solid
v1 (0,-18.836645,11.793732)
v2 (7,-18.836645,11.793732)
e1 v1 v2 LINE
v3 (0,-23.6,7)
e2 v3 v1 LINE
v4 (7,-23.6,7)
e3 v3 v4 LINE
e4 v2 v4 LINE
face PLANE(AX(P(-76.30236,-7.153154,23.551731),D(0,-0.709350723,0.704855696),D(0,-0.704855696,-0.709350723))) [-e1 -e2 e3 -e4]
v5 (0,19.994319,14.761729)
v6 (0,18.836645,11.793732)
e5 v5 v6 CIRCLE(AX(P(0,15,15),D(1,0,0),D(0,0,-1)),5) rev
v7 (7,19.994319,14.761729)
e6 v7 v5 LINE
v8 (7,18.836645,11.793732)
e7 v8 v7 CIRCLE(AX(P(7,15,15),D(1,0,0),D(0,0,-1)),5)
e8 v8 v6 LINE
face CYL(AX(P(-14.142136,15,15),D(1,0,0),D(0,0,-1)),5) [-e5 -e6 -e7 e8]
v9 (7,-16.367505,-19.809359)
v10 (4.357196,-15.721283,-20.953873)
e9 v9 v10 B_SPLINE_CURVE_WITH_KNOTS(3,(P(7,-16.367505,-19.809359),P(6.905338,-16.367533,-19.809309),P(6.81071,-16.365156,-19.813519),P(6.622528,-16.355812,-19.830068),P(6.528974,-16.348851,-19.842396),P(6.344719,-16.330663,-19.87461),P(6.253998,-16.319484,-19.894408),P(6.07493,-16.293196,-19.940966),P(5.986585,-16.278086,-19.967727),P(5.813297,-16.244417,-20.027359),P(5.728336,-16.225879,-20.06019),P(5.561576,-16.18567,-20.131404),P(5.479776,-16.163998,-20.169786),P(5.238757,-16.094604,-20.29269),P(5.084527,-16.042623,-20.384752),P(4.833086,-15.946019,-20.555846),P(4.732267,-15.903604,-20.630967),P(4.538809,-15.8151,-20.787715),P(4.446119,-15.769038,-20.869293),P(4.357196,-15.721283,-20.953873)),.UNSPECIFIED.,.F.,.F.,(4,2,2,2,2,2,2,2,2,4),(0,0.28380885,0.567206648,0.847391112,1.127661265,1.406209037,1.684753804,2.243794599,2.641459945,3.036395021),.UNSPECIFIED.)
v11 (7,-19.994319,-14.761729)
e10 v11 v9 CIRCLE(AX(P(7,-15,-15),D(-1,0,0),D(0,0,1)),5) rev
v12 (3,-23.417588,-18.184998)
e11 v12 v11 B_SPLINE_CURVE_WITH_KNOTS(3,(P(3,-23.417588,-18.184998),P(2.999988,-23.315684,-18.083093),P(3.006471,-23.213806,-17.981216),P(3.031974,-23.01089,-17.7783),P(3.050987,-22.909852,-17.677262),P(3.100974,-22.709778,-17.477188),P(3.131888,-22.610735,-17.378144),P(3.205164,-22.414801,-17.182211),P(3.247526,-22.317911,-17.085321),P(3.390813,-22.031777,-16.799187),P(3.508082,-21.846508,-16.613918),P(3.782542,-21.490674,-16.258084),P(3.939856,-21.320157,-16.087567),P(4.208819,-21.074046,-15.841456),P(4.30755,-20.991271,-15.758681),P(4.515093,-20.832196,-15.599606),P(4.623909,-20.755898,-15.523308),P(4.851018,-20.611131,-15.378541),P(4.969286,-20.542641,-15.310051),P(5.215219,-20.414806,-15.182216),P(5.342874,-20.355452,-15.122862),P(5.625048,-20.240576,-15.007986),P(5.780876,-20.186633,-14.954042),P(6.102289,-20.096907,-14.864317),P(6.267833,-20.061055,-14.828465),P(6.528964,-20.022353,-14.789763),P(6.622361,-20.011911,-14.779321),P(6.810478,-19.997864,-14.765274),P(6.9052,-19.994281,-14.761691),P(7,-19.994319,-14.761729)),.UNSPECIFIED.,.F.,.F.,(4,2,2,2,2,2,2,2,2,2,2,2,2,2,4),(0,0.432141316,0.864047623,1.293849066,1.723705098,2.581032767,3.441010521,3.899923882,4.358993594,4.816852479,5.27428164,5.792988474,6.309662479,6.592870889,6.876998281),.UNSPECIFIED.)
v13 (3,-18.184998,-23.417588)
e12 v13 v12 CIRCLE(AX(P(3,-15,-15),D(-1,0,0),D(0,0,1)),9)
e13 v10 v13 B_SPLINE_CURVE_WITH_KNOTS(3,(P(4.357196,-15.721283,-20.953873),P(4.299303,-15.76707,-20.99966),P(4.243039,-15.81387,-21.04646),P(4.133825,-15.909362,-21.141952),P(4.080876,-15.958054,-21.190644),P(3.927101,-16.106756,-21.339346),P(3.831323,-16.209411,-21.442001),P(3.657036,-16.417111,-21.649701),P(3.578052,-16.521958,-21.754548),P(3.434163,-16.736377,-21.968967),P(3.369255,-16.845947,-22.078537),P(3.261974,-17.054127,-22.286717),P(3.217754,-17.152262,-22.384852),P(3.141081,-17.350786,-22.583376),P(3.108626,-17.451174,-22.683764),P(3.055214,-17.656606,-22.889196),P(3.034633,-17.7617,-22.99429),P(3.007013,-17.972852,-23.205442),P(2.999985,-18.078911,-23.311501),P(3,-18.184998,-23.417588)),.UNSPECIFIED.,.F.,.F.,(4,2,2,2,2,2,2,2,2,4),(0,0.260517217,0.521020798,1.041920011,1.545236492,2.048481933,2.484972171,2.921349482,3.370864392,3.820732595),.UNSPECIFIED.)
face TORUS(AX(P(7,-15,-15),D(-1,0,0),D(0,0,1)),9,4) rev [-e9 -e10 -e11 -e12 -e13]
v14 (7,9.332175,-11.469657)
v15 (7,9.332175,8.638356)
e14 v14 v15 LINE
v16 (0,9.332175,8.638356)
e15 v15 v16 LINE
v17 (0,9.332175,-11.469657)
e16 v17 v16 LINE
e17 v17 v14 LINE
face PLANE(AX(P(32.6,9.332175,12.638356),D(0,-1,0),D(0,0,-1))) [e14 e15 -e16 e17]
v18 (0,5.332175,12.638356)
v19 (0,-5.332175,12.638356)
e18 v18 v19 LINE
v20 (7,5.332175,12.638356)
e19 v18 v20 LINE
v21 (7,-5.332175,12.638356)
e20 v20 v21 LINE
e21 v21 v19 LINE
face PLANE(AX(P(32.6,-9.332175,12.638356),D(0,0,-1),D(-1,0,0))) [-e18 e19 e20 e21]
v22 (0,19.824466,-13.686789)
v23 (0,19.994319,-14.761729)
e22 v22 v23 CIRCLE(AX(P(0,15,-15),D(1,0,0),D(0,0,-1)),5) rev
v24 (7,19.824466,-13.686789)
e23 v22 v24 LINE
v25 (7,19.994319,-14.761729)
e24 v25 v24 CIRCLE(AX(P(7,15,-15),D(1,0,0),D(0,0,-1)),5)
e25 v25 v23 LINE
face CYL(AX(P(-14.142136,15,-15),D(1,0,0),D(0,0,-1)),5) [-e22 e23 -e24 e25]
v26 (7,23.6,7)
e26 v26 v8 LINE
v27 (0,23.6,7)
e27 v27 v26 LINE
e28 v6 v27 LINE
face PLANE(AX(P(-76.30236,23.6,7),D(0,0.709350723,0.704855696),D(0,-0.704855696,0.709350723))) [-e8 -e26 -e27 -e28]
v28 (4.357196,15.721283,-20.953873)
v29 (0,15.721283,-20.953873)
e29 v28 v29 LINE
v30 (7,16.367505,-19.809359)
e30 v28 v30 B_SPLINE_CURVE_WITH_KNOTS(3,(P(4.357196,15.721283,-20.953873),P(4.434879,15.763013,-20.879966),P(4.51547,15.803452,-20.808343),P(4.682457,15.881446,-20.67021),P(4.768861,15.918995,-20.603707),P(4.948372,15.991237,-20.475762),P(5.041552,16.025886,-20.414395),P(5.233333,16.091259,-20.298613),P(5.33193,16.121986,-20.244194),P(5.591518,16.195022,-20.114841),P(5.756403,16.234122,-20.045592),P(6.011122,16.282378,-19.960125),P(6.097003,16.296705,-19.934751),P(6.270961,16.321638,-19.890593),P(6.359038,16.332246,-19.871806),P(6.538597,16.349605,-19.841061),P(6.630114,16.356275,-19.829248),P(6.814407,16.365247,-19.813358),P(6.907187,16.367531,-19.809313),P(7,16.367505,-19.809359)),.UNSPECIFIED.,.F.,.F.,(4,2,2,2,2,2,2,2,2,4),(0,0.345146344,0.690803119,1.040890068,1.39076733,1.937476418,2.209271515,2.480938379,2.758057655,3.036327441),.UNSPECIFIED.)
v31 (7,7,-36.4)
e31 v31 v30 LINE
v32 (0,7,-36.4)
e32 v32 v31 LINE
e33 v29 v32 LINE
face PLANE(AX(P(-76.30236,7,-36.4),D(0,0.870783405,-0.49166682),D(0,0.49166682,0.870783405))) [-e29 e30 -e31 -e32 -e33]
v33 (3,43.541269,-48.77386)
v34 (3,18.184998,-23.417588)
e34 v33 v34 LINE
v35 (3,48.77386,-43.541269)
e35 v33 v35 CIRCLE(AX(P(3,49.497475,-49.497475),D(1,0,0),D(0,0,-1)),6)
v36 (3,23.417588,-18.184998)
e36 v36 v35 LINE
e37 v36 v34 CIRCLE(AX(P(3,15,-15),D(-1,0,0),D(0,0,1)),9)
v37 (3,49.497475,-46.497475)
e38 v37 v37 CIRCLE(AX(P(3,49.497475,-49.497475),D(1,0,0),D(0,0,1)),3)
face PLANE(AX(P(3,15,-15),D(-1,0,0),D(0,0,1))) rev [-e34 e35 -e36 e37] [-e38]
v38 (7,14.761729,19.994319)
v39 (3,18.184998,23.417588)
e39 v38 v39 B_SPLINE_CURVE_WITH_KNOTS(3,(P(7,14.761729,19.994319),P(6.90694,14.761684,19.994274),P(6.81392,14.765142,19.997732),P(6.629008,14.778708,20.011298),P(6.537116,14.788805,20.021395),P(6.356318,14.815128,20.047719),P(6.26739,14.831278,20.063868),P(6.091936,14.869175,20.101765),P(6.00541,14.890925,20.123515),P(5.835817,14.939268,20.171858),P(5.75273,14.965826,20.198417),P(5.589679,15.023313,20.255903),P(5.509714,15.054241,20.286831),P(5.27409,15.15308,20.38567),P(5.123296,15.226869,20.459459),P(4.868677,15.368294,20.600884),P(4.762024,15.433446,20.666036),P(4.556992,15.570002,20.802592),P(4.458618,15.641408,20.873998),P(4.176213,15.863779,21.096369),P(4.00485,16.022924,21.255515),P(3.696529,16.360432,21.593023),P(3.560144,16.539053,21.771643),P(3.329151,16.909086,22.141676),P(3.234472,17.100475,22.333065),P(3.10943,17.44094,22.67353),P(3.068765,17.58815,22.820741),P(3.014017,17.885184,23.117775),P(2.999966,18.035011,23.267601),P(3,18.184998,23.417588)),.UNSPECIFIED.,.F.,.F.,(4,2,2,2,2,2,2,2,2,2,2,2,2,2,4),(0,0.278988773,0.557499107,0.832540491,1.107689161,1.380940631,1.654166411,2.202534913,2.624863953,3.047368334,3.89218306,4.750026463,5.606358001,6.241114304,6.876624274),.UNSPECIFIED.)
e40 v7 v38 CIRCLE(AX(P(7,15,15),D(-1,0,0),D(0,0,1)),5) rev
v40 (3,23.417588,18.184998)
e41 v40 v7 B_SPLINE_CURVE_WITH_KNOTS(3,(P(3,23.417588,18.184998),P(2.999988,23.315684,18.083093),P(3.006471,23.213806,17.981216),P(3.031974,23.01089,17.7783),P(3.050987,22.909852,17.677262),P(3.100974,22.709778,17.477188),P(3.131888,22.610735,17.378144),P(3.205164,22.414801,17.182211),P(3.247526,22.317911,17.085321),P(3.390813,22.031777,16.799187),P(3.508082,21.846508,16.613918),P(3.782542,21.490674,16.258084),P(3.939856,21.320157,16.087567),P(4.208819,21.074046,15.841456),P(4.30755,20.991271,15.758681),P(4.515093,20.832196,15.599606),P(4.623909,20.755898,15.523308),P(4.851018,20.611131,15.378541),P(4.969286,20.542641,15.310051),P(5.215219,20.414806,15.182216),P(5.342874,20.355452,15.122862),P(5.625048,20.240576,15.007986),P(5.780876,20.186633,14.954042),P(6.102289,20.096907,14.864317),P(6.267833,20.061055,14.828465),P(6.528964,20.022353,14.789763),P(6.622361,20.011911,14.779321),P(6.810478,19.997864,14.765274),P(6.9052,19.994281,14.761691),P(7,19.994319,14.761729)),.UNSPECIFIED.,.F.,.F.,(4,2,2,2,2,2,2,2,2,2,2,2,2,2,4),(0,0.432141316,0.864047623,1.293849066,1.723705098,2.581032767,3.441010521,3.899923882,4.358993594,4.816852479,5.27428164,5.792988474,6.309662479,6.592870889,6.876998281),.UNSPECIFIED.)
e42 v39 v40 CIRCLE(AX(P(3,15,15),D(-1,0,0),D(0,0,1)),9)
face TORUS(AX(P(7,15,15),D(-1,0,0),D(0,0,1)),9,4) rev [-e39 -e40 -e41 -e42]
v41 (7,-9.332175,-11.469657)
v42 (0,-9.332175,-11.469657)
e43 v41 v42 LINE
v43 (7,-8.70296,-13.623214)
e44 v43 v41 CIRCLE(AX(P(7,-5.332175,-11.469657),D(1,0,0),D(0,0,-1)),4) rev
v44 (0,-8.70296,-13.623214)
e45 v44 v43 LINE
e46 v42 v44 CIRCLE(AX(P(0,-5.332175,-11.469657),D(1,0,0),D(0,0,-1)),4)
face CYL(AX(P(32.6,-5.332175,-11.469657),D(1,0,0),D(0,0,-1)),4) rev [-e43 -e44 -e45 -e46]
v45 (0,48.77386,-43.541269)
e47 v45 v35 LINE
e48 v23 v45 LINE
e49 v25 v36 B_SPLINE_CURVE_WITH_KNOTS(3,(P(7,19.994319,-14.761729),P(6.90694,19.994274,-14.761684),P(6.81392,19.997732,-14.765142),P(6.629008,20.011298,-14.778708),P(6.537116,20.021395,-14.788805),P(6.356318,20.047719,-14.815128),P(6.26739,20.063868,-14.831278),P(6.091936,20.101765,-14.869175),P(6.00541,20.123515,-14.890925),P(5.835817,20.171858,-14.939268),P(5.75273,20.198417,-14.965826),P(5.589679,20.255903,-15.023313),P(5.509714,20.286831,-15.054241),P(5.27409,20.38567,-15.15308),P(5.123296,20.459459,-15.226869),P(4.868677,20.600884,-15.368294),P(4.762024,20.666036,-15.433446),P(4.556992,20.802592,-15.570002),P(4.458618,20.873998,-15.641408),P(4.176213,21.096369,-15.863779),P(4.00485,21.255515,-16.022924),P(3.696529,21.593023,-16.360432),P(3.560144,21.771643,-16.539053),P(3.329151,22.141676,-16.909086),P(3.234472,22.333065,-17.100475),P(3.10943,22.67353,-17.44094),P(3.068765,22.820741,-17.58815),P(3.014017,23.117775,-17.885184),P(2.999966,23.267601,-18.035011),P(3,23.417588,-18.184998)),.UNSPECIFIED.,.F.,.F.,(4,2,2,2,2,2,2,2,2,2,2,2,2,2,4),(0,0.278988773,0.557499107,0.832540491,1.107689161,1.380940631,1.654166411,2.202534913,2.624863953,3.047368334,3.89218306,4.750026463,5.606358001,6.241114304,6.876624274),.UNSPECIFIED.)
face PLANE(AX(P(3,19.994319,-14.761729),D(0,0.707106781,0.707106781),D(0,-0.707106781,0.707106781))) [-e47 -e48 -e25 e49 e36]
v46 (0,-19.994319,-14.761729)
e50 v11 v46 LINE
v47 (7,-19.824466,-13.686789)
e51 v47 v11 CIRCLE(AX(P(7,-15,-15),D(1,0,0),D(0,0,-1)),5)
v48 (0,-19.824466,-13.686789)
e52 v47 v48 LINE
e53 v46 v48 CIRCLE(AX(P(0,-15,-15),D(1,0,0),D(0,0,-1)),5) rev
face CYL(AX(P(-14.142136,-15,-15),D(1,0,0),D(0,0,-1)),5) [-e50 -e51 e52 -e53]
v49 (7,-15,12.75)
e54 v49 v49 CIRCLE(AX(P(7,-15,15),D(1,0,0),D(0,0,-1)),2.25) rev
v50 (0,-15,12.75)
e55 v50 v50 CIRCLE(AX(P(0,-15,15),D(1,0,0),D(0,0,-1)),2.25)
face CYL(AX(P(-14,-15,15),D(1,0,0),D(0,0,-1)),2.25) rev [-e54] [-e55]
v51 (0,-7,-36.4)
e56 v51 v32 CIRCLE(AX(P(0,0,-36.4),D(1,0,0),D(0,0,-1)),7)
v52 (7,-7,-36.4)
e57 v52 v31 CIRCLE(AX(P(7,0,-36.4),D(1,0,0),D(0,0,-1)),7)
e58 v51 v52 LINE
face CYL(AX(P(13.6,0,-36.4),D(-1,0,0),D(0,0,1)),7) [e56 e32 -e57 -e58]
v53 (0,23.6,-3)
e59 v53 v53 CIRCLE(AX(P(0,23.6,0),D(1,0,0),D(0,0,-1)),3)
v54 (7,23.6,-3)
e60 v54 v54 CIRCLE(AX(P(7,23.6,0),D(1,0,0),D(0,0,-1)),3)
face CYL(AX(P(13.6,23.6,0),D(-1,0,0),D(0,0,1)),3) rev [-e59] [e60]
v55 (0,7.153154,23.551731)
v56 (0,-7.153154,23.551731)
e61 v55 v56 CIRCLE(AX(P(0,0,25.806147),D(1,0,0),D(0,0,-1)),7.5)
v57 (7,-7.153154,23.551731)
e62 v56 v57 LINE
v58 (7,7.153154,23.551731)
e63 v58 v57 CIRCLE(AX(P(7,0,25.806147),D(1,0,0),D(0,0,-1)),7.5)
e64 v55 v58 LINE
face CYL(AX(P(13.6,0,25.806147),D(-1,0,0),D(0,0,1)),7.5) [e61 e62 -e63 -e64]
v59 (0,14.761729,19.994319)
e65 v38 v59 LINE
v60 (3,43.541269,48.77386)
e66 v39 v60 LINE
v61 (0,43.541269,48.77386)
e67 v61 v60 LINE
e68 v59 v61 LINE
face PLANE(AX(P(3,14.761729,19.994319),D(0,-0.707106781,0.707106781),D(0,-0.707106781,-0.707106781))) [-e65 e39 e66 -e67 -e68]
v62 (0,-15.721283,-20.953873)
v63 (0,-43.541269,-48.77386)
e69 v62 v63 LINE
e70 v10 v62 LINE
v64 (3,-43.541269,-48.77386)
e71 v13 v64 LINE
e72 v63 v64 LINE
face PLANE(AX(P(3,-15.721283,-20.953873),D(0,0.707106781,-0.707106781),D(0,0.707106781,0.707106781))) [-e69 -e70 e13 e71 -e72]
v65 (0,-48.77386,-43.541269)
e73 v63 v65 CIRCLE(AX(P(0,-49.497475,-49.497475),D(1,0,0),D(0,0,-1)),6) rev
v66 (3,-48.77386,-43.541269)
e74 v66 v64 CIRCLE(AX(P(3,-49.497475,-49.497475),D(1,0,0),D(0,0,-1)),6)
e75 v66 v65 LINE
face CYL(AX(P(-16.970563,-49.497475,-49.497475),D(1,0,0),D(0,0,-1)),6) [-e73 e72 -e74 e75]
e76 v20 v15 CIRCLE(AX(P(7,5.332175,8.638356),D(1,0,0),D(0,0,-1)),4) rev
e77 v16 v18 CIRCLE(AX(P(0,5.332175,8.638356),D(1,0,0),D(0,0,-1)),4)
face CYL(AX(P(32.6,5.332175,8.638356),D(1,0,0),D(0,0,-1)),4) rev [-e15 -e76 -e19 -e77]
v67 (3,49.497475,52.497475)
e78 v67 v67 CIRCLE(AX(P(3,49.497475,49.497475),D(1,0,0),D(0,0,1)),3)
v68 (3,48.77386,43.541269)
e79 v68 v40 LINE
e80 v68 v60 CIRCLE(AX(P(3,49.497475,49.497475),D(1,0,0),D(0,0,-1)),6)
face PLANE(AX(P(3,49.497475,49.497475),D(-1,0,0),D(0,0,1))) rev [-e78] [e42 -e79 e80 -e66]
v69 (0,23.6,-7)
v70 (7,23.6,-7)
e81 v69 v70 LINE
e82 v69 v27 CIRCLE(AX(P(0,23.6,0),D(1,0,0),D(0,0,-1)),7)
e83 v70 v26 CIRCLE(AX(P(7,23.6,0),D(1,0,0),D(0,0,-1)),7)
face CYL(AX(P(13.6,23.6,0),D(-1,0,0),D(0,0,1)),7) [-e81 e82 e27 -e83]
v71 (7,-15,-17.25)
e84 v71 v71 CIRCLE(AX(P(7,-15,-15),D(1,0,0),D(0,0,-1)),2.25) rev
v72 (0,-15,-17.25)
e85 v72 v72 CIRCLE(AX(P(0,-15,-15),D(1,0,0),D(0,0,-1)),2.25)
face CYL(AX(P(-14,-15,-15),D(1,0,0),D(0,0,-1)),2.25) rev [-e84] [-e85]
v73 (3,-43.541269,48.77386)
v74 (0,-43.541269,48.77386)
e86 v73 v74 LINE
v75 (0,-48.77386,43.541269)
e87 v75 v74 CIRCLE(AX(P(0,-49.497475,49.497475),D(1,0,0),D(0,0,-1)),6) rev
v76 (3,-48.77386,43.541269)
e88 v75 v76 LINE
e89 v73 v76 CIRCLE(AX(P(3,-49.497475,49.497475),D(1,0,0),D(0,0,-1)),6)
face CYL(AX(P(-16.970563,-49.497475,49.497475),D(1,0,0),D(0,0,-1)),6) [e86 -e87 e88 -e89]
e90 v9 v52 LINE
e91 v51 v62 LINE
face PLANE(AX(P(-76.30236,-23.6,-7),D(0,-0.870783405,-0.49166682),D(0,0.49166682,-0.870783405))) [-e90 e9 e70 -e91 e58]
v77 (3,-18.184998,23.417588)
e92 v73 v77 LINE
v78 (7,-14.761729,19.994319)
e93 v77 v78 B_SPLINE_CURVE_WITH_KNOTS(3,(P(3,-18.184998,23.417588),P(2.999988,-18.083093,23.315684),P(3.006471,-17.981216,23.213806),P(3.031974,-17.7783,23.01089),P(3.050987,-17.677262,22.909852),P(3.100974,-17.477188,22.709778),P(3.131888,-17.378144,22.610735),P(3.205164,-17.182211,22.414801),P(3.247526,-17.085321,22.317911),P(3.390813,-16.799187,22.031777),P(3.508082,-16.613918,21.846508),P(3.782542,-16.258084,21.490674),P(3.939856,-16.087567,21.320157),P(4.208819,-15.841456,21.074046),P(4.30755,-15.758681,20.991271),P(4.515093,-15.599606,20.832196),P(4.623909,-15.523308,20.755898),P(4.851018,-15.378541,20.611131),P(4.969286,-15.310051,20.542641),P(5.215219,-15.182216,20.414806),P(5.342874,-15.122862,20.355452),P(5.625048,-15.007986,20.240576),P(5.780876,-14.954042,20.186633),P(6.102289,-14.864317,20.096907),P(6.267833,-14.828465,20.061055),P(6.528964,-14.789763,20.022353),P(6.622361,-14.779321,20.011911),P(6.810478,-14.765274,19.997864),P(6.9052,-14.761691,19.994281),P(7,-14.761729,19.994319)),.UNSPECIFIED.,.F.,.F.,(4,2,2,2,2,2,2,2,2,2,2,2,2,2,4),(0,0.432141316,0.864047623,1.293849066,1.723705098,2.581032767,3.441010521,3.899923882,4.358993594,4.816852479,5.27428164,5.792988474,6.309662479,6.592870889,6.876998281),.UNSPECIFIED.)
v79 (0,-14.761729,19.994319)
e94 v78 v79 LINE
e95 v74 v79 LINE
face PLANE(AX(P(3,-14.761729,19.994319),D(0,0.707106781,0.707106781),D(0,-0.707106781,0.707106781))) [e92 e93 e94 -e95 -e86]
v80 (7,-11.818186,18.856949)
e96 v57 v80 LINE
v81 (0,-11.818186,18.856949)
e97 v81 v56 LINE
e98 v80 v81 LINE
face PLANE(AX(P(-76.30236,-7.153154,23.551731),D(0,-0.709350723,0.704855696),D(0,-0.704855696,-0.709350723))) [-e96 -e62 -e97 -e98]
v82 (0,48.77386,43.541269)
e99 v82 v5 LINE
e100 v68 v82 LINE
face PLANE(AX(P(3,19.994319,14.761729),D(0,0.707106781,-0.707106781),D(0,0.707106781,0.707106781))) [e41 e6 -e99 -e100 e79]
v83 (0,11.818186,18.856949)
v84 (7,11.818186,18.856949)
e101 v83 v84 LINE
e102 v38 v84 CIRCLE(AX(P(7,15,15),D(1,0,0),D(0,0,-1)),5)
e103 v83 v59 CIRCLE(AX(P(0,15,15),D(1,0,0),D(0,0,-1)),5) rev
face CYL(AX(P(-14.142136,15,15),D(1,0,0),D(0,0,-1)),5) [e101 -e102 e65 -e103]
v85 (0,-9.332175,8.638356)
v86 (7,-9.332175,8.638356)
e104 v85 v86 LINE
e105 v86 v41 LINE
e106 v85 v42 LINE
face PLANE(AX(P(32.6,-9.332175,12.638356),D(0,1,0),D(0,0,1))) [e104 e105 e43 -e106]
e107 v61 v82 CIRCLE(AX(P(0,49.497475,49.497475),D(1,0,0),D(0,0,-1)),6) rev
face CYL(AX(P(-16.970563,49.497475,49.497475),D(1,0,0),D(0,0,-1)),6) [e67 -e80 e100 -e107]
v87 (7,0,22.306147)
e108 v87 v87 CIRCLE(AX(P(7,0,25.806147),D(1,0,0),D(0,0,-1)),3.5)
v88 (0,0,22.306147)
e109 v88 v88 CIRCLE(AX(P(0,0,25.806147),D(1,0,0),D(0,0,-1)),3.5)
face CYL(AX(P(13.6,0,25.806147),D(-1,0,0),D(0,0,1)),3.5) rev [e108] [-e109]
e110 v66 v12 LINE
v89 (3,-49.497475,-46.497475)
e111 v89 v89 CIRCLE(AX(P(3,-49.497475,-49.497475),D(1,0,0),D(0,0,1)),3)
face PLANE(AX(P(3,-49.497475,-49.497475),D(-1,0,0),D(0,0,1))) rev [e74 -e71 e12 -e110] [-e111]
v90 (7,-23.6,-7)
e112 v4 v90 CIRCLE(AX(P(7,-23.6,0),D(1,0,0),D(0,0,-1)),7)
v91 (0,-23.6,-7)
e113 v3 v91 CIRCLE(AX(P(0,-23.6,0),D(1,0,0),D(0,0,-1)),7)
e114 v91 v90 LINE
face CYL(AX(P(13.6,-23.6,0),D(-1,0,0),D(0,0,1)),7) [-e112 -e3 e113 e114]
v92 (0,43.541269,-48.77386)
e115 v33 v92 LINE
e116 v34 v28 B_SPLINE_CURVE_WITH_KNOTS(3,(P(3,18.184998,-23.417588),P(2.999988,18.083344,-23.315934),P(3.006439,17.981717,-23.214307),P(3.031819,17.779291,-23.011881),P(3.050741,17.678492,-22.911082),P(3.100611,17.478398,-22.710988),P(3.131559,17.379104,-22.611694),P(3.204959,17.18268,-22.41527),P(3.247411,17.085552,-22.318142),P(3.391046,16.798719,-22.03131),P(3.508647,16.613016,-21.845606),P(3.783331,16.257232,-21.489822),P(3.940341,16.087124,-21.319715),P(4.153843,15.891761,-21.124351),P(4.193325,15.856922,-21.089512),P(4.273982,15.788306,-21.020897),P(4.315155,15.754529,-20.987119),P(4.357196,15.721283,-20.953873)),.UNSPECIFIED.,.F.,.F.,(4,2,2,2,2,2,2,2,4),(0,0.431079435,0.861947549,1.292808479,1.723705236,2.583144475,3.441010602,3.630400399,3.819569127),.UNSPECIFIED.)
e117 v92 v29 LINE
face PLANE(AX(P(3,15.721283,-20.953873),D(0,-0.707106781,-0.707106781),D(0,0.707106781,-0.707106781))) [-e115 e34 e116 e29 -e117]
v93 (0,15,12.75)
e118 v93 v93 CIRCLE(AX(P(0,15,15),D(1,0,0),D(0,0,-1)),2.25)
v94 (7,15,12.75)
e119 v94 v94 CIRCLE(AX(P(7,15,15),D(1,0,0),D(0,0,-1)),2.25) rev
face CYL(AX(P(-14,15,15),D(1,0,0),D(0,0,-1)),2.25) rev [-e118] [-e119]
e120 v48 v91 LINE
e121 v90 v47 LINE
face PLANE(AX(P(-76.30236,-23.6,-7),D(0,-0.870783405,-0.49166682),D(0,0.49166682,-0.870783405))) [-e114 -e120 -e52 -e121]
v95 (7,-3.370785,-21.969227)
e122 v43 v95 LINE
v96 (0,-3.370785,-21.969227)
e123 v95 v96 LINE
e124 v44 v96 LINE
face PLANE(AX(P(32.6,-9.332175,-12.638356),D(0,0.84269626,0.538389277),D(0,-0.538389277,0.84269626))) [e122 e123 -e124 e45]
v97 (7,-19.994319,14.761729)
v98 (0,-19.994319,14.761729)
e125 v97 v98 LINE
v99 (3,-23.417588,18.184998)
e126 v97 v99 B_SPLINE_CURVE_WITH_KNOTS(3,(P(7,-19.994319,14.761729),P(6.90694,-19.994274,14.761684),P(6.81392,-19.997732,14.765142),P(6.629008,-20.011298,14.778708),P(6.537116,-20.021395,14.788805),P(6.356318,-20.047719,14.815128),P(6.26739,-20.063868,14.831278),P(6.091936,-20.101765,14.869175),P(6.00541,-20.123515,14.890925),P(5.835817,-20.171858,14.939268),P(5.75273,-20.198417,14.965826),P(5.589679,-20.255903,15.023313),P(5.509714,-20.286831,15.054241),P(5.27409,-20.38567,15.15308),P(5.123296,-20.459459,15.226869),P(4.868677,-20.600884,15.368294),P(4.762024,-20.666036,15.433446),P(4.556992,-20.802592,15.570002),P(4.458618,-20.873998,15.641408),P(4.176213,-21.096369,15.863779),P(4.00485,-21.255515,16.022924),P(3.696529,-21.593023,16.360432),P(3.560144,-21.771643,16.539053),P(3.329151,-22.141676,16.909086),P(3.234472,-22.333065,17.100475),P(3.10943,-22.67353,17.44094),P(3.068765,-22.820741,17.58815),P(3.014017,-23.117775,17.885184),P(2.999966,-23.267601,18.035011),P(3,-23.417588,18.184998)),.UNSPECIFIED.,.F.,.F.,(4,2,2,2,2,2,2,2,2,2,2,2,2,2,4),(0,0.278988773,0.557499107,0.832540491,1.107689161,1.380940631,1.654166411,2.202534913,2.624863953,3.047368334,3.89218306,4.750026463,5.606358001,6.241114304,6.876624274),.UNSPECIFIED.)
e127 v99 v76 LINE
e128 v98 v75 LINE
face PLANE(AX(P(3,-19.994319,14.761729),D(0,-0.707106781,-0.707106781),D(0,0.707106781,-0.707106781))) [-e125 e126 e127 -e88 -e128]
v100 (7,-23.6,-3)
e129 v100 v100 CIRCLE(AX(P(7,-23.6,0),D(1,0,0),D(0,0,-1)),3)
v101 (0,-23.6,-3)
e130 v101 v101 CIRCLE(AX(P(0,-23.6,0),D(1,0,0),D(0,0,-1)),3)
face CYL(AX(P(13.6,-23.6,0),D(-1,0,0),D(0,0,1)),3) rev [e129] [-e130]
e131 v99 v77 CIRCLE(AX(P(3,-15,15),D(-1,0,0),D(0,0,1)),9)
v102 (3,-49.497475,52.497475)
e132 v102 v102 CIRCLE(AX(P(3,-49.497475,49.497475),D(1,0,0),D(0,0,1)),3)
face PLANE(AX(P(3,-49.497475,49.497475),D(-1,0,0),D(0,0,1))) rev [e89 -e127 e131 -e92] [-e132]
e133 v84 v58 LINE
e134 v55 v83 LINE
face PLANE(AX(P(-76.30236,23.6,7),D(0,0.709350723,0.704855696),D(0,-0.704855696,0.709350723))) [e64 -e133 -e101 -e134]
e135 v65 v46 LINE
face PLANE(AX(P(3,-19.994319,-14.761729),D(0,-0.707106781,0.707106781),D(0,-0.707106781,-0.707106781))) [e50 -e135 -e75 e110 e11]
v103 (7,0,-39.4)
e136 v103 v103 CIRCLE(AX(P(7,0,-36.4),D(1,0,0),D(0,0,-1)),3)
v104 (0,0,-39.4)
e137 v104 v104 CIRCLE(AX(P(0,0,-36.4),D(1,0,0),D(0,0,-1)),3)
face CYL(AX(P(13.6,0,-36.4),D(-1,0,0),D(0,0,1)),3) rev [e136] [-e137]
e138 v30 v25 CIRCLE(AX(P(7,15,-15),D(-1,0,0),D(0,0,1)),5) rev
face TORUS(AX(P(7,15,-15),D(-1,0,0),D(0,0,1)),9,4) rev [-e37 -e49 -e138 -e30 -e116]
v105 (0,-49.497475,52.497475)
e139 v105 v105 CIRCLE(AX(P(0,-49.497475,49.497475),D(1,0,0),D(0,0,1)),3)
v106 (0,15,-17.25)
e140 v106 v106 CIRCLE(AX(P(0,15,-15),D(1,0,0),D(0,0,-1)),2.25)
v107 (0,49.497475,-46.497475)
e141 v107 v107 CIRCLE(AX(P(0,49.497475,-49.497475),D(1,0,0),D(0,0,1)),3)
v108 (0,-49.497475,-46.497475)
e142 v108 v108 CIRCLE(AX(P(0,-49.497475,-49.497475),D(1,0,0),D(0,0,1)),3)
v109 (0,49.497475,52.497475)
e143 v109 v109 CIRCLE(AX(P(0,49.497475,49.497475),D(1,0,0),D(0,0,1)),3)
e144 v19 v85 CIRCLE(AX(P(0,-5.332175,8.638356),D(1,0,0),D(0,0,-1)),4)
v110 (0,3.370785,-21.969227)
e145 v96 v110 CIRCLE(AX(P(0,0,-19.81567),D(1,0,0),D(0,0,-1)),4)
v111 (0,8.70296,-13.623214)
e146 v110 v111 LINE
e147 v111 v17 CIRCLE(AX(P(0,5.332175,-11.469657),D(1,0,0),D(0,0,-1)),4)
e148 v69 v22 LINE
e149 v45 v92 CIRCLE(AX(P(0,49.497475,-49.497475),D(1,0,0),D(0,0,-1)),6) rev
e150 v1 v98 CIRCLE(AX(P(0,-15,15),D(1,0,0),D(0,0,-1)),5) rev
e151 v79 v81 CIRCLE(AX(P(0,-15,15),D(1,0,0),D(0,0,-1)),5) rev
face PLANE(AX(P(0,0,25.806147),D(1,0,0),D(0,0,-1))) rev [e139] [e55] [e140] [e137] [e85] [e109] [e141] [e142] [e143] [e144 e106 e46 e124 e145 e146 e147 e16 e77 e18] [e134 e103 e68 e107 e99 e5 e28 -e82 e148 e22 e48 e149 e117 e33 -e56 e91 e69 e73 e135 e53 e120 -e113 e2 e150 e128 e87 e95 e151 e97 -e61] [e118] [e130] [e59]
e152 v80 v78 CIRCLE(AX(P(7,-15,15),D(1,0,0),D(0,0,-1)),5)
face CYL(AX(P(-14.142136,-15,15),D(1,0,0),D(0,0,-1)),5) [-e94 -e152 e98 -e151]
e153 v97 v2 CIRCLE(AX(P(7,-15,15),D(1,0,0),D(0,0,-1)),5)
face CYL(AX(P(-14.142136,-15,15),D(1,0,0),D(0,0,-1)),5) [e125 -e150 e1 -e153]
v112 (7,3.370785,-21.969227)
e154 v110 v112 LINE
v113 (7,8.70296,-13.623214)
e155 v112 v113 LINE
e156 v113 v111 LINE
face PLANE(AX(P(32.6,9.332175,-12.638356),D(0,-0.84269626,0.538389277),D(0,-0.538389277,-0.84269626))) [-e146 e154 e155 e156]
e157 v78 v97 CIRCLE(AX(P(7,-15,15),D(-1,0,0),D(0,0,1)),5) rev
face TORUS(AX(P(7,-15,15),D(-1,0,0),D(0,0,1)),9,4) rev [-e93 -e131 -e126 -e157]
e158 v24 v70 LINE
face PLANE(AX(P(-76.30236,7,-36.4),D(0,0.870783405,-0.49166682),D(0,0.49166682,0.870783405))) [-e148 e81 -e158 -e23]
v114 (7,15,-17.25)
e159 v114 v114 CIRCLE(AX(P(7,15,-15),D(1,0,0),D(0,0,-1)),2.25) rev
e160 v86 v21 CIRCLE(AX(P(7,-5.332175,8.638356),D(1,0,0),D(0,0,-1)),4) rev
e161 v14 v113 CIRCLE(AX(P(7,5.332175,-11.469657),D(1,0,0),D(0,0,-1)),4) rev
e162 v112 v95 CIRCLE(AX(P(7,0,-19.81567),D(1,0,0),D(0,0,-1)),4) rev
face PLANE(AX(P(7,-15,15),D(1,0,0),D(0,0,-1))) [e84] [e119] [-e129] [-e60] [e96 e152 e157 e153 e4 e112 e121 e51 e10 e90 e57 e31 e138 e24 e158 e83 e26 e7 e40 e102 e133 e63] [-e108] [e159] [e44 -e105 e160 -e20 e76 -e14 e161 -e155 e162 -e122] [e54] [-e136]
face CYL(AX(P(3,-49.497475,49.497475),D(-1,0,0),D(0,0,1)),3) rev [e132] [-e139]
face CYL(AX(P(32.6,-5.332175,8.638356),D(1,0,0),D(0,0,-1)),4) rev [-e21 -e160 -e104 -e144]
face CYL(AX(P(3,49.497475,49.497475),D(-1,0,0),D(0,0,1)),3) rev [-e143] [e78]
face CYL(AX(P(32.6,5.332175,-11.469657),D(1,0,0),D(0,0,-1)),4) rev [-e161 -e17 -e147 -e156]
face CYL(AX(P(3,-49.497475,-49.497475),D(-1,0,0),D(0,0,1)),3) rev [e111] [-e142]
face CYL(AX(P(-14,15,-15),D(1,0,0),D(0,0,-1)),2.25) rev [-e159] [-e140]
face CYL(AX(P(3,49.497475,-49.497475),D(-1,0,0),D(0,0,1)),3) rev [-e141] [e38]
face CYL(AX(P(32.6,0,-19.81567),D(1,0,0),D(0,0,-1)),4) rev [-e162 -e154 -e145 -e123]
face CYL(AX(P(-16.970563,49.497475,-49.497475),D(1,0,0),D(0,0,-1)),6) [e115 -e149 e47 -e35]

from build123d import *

# Parameters (mm, degrees)
SKETCH1_R             = 7.5
SKETCH1_R_2           = 3.5
BOSS_EXTRUDE1_DEPTH   = 13.6
SKETCH1_R_3           = 7
SKETCH1_R_4           = 3
BOSS_EXTRUDE1_2_DEPTH = 13.6
BOSS_EXTRUDE1_3_DEPTH = 13.6
BOSS_EXTRUDE1_4_DEPTH = 13.6
BOSS_EXTRUDE2_START   = -13.6
BOSS_EXTRUDE2_DEPTH   = 13.6
SKETCH3_R             = 2.25
CUT_EXTRUDE1_DEPTH    = 27.6
SKETCH4_R             = 5
SKETCH4_R_2           = 2.25
BOSS_EXTRUDE3_DEPTH   = 13.6
CUT_EXTRUDE2_DEPTH    = 32.6
FILLET1_R             = 4
BOSS_EXTRUDE4_START   = -3
BOSS_EXTRUDE4_DEPTH   = 3
FILLET2_R             = 4
CUT_EXTRUDE4_DEPTH    = 6.6
SKETCH9_R             = 6
SKETCH9_R_2           = 3
BOSS_EXTRUDE5_DEPTH   = 3


with BuildPart() as part:
    # Sketch1 → Boss-Extrude1 (new body)
    with BuildSketch(Plane.YZ):
        with Locations(Location((0, 25.806146942, 0), (0, 0, 270))):
            Circle(SKETCH1_R)
        with Locations(Location((0, 25.806146942, 0), (0, 0, 270))):
            Circle(SKETCH1_R_2, mode=Mode.SUBTRACT)
    extrude(amount=BOSS_EXTRUDE1_DEPTH)



with BuildPart() as body_2:
    # Sketch1 → Boss-Extrude1 2 (new body)
    with BuildSketch(Plane.YZ):
        with Locations(Location((-23.6, 0, 0), (0, 0, 270))):
            Circle(SKETCH1_R_3)
        with Locations(Location((-23.6, 0, 0), (0, 0, 270))):
            Circle(SKETCH1_R_4, mode=Mode.SUBTRACT)
    extrude(amount=BOSS_EXTRUDE1_2_DEPTH)


with BuildPart() as body_3:
    # Sketch1 → Boss-Extrude1 3 (new body)
    with BuildSketch(Plane.YZ):
        with Locations(Location((0, -36.4, 0), (0, 0, 270))):
            Circle(SKETCH1_R_3)
        with Locations(Location((0, -36.4, 0), (0, 0, 270))):
            Circle(SKETCH1_R_4, mode=Mode.SUBTRACT)
    extrude(amount=BOSS_EXTRUDE1_3_DEPTH)


with BuildPart() as body_4:
    # Sketch1 → Boss-Extrude1 4 (new body)
    with BuildSketch(Plane.YZ):
        with Locations(Location((23.6, 0, 0), (0, 0, 270))):
            Circle(SKETCH1_R_3)
        with Locations(Location((23.6, 0, 0), (0, 0, 270))):
            Circle(SKETCH1_R_4, mode=Mode.SUBTRACT)
    extrude(amount=BOSS_EXTRUDE1_4_DEPTH)


with BuildPart() as part_1:
    add(part.part)

    add(body_2.part)  # Boss-Extrude2 merges body 2

    add(body_3.part)  # Boss-Extrude2 merges body 3

    add(body_4.part)  # Boss-Extrude2 merges body 4
    # Sketch2 → Boss-Extrude2 (add)
    with BuildSketch(Plane.YZ.offset(13.6).offset(BOSS_EXTRUDE2_START)):
        with BuildLine():
            Line((-7.153153898, 23.551731428), (-23.6, 7))
            ThreePointArc((-23.6, 7), (-16.6, 0), (-23.6, -7))
            Line((-23.6, -7), (-7, -36.4))
            ThreePointArc((-7, -36.4), (0, -29.4), (7, -36.4))
            Line((7, -36.4), (23.6, -7))
            ThreePointArc((23.6, -7), (16.6, 0), (23.6, 7))
            Line((23.6, 7), (7.153153898, 23.551731428))
            ThreePointArc((7.153153898, 23.551731428), (0, 18.306146942), (-7.153153898, 23.551731428))
        make_face()
    extrude(amount=BOSS_EXTRUDE2_DEPTH)

    # Sketch3 → Cut-Extrude1 (cut)
    with BuildSketch(Plane.YZ.offset(13.6)):
        with Locations((15, 15)):
            Circle(SKETCH3_R)
        with Locations(Location((15, -15, 0), (0, 0, 270))):
            Circle(SKETCH3_R)
        with Locations(Location((-15, -15, 0), (0, 0, 270))):
            Circle(SKETCH3_R)
        with Locations((-15, 15)):
            Circle(SKETCH3_R)
    extrude(amount=-CUT_EXTRUDE1_DEPTH, mode=Mode.SUBTRACT)

    # Sketch4 → Boss-Extrude3 (add)
    # profile 1 of 4: a face of its own
    with BuildSketch(Plane.YZ.offset(13.6)):
        with Locations((-15, 15)):
            Circle(SKETCH4_R)
        with Locations(Location((-15, 15, 0), (0, 0, 270))):
            Circle(SKETCH4_R_2, mode=Mode.SUBTRACT)
    # profile 2 of 4: a face of its own
    with BuildSketch(Plane.YZ.offset(13.6)):
        with Locations((15, 15)):
            Circle(SKETCH4_R)
        with Locations(Location((15, 15, 0), (0, 0, 270))):
            Circle(SKETCH4_R_2, mode=Mode.SUBTRACT)
    # profile 3 of 4: a face of its own
    with BuildSketch(Plane.YZ.offset(13.6)):
        with Locations((15, -15)):
            Circle(SKETCH4_R)
        with Locations(Location((15, -15, 0), (0, 0, 270))):
            Circle(SKETCH4_R_2, mode=Mode.SUBTRACT)
    # profile 4 of 4: a face of its own
    with BuildSketch(Plane.YZ.offset(13.6)):
        with Locations((-15, -15)):
            Circle(SKETCH4_R)
        with Locations(Location((-15, -15, 0), (0, 0, 270))):
            Circle(SKETCH4_R_2, mode=Mode.SUBTRACT)
    extrude(amount=-BOSS_EXTRUDE3_DEPTH)

    # Sketch5 → Cut-Extrude2 (cut)
    with BuildSketch(Plane.YZ):
        Polygon((-9.332174862, -12.638356022), (0, -27.245238414), (9.332174862, -12.638356022), (9.332174862, 12.638356022), (-9.332174862, 12.638356022), align=None)
    extrude(amount=CUT_EXTRUDE2_DEPTH, mode=Mode.SUBTRACT)

    # Fillet1
    fillet1_edges = [part_1.edges().sort_by_distance(p)[0] for p in [
        (6.8, 0, -27.245238414),
        (6.8, 9.332174862, -12.638356022),
        (6.8, 9.332174862, 12.638356022),
        (6.8, -9.332174862, 12.638356022),
        (6.8, -9.332174862, -12.638356022),
    ]]
    fillet(fillet1_edges, radius=FILLET1_R)

    # Sketch6 → Boss-Extrude4 (add)
    with BuildSketch(Plane(origin=(0, 0, 0), x_dir=(0, -1, 0), z_dir=(-1, 0, 0)).offset(BOSS_EXTRUDE4_START)):
        with BuildLine():
            Line((-51.756049967, 47.522927219), (-52.113769773, 46.881179593))
            Line((-52.113769773, 46.881179593), (-19.994319481, 14.7617293))
            ThreePointArc((-19.994319481, 14.7617293), (-18.535533906, 18.535533906), (-14.7617293, 19.994319481))
            Line((-14.7617293, 19.994319481), (-46.881179593, 52.113769773))
            Line((-46.881179593, 52.113769773), (-47.376154339, 51.618795027))
            ThreePointArc((-47.376154339, 51.618795027), (-47.448391229, 47.306297603), (-51.756049967, 47.522927219))
        make_face()
        with BuildLine():
            Line((46.881179593, 52.113769773), (47.376154339, 51.618795027))
            ThreePointArc((47.376154339, 51.618795027), (47.376154339, 47.376154339), (51.618795027, 47.376154339))
            Line((51.618795027, 47.376154339), (52.113769773, 46.881179593))
            Line((52.113769773, 46.881179593), (19.994319481, 14.7617293))
            ThreePointArc((19.994319481, 14.7617293), (18.535533906, 18.535533906), (14.7617293, 19.994319481))
            Line((14.7617293, 19.994319481), (46.881179593, 52.113769773))
        make_face()
        with BuildLine():
            Line((46.881179593, -52.113769773), (47.376154339, -51.618795027))
            ThreePointArc((47.376154339, -51.618795027), (47.376154339, -47.376154339), (51.618795027, -47.376154339))
            Line((51.618795027, -47.376154339), (52.113769773, -46.881179593))
            Line((52.113769773, -46.881179593), (19.994319481, -14.7617293))
            ThreePointArc((19.994319481, -14.7617293), (19.060522514, -17.917560096), (16.367505015, -19.809358589))
            Line((16.367505015, -19.809358589), (15.721282674, -20.953872855))
            Line((15.721282674, -20.953872855), (46.881179593, -52.113769773))
        make_face()
        with BuildLine():
            Line((-52.113769773, -46.881179593), (-51.618795027, -47.376154339))
            ThreePointArc((-51.618795027, -47.376154339), (-47.376154339, -47.376154339), (-47.376154339, -51.618795027))
            Line((-47.376154339, -51.618795027), (-46.881179593, -52.113769773))
            Line((-46.881179593, -52.113769773), (-15.721282674, -20.953872855))
            Line((-15.721282674, -20.953872855), (-16.367505015, -19.809358589))
            ThreePointArc((-16.367505015, -19.809358589), (-19.060522514, -17.917560096), (-19.994319481, -14.7617293))
            Line((-19.994319481, -14.7617293), (-52.113769773, -46.881179593))
        make_face()
    extrude(amount=BOSS_EXTRUDE4_DEPTH)

    # Fillet2
    # the kernel refuses this fillet: 4 mm, written as the material it adds along each edge
    with BuildSketch(Plane(origin=(3, 15, -15), x_dir=(0, -0.9883550741062095, 0.15216519802014272), z_dir=(0, 0.15216519802014272, 0.9883550741062095))) as fillet2_piece_1_section:
        with BuildLine():
            CenterArc((5 + FILLET2_R, FILLET2_R), FILLET2_R, 180, 90)
            Line((5 + FILLET2_R, 0), (5, 0))
            Line((5, 0), (5, FILLET2_R))
        make_face()
    fillet2_piece_1 = revolve(axis=Axis((3, 15, -15), (1, 0, 0)), revolution_arc=306.108966915, mode=Mode.PRIVATE)
    fillet2_piece_1 = split(fillet2_piece_1, bisect_by=Plane(origin=(3.869561111, 16.288295425, -21.520885606), z_dir=(0, 0.7071067811865476, 0.7071067811865475)), keep=Keep.TOP, mode=Mode.PRIVATE)
    fillet2_piece_1 = split(fillet2_piece_1, bisect_by=Plane(origin=(3.869561111, 21.520885606, -16.288295425), z_dir=(0, -0.7071067811865476, -0.7071067811865476)), keep=Keep.TOP, mode=Mode.PRIVATE)
    add(fillet2_piece_1)
    with BuildSketch(Plane(origin=(3, 15, 15), x_dir=(0, -0.45980873999071614, -0.8880179742708759), z_dir=(0, -0.8880179742708759, 0.45980873999071614))) as fillet2_piece_2_section:
        with BuildLine():
            CenterArc((5 + FILLET2_R, FILLET2_R), FILLET2_R, 180, 90)
            Line((5 + FILLET2_R, 0), (5, 0))
            Line((5, 0), (5, FILLET2_R))
        make_face()
    fillet2_piece_2 = revolve(axis=Axis((3, 15, 15), (1, 0, 0)), revolution_arc=324.749533067, mode=Mode.PRIVATE)
    fillet2_piece_2 = split(fillet2_piece_2, bisect_by=Plane(origin=(3.903728463, 15.315269704, 15.337563929), z_dir=(0, 0.7093507229264948, 0.704855695787201)), keep=Keep.TOP, mode=Mode.PRIVATE)
    fillet2_piece_2 = split(fillet2_piece_2, bisect_by=Plane(origin=(3.903728463, 16.216872474, 21.449462655), z_dir=(0, 0.7071067811865475, -0.7071067811865477)), keep=Keep.TOP, mode=Mode.PRIVATE)
    fillet2_piece_2 = split(fillet2_piece_2, bisect_by=Plane(origin=(3.903728463, 21.449462655, 16.216872474), z_dir=(0, -0.7071067811865472, 0.7071067811865478)), keep=Keep.TOP, mode=Mode.PRIVATE)
    add(fillet2_piece_2)
    with BuildSketch(Plane(origin=(3, -15, -15), x_dir=(0, 0.45952627401725515, 0.8881641759763893), z_dir=(0, 0.8881641759763893, -0.45952627401725515))) as fillet2_piece_3_section:
        with BuildLine():
            CenterArc((5 + FILLET2_R, FILLET2_R), FILLET2_R, 180, 90)
            Line((5 + FILLET2_R, 0), (5, 0))
            Line((5, 0), (5, FILLET2_R))
        make_face()
    fillet2_piece_3 = revolve(axis=Axis((3, -15, -15), (1, 0, 0)), revolution_arc=306.108966915, mode=Mode.PRIVATE)
    fillet2_piece_3 = split(fillet2_piece_3, bisect_by=Plane(origin=(3.869559864, -21.520885794, -16.288295613), z_dir=(0, 0.7071067811865472, -0.707106781186548)), keep=Keep.TOP, mode=Mode.PRIVATE)
    fillet2_piece_3 = split(fillet2_piece_3, bisect_by=Plane(origin=(3.869559864, -16.288295613, -21.520885794), z_dir=(0, -0.7071067811865472, 0.7071067811865478)), keep=Keep.TOP, mode=Mode.PRIVATE)
    add(fillet2_piece_3)
    with BuildSketch(Plane(origin=(3, -15, 15), x_dir=(0, 0.45980873999071653, -0.8880179742708757), z_dir=(0, 0.8880179742708757, 0.45980873999071653))) as fillet2_piece_4_section:
        with BuildLine():
            CenterArc((5 + FILLET2_R, -FILLET2_R), FILLET2_R, 90, 90)
            Line((5 + FILLET2_R, 0), (5, 0))
            Line((5, 0), (5, -FILLET2_R))
        make_face()
    fillet2_piece_4 = revolve(axis=Axis((3, -15, 15), (-1, 0, 0)), revolution_arc=324.749533067, mode=Mode.PRIVATE)
    fillet2_piece_4 = split(fillet2_piece_4, bisect_by=Plane(origin=(3.903728463, -15.315269704, 15.337563929), z_dir=(0, -0.709350722926495, 0.7048556957872008)), keep=Keep.TOP, mode=Mode.PRIVATE)
    fillet2_piece_4 = split(fillet2_piece_4, bisect_by=Plane(origin=(3.903728463, -21.449462655, 16.216872474), z_dir=(0, 0.7071067811865475, 0.7071067811865477)), keep=Keep.TOP, mode=Mode.PRIVATE)
    fillet2_piece_4 = split(fillet2_piece_4, bisect_by=Plane(origin=(3.903728463, -16.216872474, 21.449462655), z_dir=(0, -0.7071067811865477, -0.7071067811865475)), keep=Keep.TOP, mode=Mode.PRIVATE)
    add(fillet2_piece_4)

    # Sketch7 → Cut-Extrude4 (cut)
    with BuildSketch(Plane.YZ.offset(13.6)):
        with BuildLine():
            Line((-18.836645052, 11.79373196), (-23.6, 7))
            ThreePointArc((-23.6, 7), (-30.6, 0), (-23.6, -7))
            Line((-23.6, -7), (-19.824466352, -13.686788509))
            ThreePointArc((-19.824466352, -13.686788509), (-19.353917023, -17.458334102), (-16.367505015, -19.809358589))
            Line((-16.367505015, -19.809358589), (-7, -36.4))
            ThreePointArc((-7, -36.4), (0, -43.4), (7, -36.4))
            Line((7, -36.4), (16.367505015, -19.809358589))
            ThreePointArc((16.367505015, -19.809358589), (19.353917023, -17.458334102), (19.824466352, -13.686788509))
            Line((19.824466352, -13.686788509), (23.6, -7))
            ThreePointArc((23.6, -7), (30.6, 0), (23.6, 7))
            Line((23.6, 7), (18.836645052, 11.79373196))
            ThreePointArc((18.836645052, 11.79373196), (18.546753615, 18.524278479), (11.818185898, 18.856949445))
            Line((11.818185898, 18.856949445), (7.153153898, 23.551731428))
            ThreePointArc((7.153153898, 23.551731428), (0, 33.306146942), (-7.153153898, 23.551731428))
            Line((-7.153153898, 23.551731428), (-11.818185898, 18.856949445))
            ThreePointArc((-11.818185898, 18.856949445), (-18.546753615, 18.524278479), (-18.836645052, 11.79373196))
        make_face()
    extrude(amount=-CUT_EXTRUDE4_DEPTH, mode=Mode.SUBTRACT)

    # Sketch9 → Boss-Extrude5 (add)
    # profile 1 of 4: a face of its own
    with BuildSketch(Plane.YZ.offset(3)):
        with Locations((-49.497474683, 49.497474683)):
            Circle(SKETCH9_R)
        with Locations(Location((-49.497474683, 49.497474683, 0), (0, 0, 90))):
            Circle(SKETCH9_R_2, mode=Mode.SUBTRACT)
    # profile 2 of 4: a face of its own
    with BuildSketch(Plane.YZ.offset(3)):
        with Locations((49.497474683, 49.497474683)):
            Circle(SKETCH9_R)
        with Locations(Location((49.497474683, 49.497474683, 0), (0, 0, 90))):
            Circle(SKETCH9_R_2, mode=Mode.SUBTRACT)
    # profile 3 of 4: a face of its own
    with BuildSketch(Plane.YZ.offset(3)):
        with Locations((49.497474683, -49.497474683)):
            Circle(SKETCH9_R)
        with Locations(Location((49.497474683, -49.497474683, 0), (0, 0, 90))):
            Circle(SKETCH9_R_2, mode=Mode.SUBTRACT)
    # profile 4 of 4: a face of its own
    with BuildSketch(Plane.YZ.offset(3)):
        with Locations((-49.497474683, -49.497474683)):
            Circle(SKETCH9_R)
        with Locations(Location((-49.497474683, -49.497474683, 0), (0, 0, 90))):
            Circle(SKETCH9_R_2, mode=Mode.SUBTRACT)
    extrude(amount=-BOSS_EXTRUDE5_DEPTH)


solid = part_1.part
